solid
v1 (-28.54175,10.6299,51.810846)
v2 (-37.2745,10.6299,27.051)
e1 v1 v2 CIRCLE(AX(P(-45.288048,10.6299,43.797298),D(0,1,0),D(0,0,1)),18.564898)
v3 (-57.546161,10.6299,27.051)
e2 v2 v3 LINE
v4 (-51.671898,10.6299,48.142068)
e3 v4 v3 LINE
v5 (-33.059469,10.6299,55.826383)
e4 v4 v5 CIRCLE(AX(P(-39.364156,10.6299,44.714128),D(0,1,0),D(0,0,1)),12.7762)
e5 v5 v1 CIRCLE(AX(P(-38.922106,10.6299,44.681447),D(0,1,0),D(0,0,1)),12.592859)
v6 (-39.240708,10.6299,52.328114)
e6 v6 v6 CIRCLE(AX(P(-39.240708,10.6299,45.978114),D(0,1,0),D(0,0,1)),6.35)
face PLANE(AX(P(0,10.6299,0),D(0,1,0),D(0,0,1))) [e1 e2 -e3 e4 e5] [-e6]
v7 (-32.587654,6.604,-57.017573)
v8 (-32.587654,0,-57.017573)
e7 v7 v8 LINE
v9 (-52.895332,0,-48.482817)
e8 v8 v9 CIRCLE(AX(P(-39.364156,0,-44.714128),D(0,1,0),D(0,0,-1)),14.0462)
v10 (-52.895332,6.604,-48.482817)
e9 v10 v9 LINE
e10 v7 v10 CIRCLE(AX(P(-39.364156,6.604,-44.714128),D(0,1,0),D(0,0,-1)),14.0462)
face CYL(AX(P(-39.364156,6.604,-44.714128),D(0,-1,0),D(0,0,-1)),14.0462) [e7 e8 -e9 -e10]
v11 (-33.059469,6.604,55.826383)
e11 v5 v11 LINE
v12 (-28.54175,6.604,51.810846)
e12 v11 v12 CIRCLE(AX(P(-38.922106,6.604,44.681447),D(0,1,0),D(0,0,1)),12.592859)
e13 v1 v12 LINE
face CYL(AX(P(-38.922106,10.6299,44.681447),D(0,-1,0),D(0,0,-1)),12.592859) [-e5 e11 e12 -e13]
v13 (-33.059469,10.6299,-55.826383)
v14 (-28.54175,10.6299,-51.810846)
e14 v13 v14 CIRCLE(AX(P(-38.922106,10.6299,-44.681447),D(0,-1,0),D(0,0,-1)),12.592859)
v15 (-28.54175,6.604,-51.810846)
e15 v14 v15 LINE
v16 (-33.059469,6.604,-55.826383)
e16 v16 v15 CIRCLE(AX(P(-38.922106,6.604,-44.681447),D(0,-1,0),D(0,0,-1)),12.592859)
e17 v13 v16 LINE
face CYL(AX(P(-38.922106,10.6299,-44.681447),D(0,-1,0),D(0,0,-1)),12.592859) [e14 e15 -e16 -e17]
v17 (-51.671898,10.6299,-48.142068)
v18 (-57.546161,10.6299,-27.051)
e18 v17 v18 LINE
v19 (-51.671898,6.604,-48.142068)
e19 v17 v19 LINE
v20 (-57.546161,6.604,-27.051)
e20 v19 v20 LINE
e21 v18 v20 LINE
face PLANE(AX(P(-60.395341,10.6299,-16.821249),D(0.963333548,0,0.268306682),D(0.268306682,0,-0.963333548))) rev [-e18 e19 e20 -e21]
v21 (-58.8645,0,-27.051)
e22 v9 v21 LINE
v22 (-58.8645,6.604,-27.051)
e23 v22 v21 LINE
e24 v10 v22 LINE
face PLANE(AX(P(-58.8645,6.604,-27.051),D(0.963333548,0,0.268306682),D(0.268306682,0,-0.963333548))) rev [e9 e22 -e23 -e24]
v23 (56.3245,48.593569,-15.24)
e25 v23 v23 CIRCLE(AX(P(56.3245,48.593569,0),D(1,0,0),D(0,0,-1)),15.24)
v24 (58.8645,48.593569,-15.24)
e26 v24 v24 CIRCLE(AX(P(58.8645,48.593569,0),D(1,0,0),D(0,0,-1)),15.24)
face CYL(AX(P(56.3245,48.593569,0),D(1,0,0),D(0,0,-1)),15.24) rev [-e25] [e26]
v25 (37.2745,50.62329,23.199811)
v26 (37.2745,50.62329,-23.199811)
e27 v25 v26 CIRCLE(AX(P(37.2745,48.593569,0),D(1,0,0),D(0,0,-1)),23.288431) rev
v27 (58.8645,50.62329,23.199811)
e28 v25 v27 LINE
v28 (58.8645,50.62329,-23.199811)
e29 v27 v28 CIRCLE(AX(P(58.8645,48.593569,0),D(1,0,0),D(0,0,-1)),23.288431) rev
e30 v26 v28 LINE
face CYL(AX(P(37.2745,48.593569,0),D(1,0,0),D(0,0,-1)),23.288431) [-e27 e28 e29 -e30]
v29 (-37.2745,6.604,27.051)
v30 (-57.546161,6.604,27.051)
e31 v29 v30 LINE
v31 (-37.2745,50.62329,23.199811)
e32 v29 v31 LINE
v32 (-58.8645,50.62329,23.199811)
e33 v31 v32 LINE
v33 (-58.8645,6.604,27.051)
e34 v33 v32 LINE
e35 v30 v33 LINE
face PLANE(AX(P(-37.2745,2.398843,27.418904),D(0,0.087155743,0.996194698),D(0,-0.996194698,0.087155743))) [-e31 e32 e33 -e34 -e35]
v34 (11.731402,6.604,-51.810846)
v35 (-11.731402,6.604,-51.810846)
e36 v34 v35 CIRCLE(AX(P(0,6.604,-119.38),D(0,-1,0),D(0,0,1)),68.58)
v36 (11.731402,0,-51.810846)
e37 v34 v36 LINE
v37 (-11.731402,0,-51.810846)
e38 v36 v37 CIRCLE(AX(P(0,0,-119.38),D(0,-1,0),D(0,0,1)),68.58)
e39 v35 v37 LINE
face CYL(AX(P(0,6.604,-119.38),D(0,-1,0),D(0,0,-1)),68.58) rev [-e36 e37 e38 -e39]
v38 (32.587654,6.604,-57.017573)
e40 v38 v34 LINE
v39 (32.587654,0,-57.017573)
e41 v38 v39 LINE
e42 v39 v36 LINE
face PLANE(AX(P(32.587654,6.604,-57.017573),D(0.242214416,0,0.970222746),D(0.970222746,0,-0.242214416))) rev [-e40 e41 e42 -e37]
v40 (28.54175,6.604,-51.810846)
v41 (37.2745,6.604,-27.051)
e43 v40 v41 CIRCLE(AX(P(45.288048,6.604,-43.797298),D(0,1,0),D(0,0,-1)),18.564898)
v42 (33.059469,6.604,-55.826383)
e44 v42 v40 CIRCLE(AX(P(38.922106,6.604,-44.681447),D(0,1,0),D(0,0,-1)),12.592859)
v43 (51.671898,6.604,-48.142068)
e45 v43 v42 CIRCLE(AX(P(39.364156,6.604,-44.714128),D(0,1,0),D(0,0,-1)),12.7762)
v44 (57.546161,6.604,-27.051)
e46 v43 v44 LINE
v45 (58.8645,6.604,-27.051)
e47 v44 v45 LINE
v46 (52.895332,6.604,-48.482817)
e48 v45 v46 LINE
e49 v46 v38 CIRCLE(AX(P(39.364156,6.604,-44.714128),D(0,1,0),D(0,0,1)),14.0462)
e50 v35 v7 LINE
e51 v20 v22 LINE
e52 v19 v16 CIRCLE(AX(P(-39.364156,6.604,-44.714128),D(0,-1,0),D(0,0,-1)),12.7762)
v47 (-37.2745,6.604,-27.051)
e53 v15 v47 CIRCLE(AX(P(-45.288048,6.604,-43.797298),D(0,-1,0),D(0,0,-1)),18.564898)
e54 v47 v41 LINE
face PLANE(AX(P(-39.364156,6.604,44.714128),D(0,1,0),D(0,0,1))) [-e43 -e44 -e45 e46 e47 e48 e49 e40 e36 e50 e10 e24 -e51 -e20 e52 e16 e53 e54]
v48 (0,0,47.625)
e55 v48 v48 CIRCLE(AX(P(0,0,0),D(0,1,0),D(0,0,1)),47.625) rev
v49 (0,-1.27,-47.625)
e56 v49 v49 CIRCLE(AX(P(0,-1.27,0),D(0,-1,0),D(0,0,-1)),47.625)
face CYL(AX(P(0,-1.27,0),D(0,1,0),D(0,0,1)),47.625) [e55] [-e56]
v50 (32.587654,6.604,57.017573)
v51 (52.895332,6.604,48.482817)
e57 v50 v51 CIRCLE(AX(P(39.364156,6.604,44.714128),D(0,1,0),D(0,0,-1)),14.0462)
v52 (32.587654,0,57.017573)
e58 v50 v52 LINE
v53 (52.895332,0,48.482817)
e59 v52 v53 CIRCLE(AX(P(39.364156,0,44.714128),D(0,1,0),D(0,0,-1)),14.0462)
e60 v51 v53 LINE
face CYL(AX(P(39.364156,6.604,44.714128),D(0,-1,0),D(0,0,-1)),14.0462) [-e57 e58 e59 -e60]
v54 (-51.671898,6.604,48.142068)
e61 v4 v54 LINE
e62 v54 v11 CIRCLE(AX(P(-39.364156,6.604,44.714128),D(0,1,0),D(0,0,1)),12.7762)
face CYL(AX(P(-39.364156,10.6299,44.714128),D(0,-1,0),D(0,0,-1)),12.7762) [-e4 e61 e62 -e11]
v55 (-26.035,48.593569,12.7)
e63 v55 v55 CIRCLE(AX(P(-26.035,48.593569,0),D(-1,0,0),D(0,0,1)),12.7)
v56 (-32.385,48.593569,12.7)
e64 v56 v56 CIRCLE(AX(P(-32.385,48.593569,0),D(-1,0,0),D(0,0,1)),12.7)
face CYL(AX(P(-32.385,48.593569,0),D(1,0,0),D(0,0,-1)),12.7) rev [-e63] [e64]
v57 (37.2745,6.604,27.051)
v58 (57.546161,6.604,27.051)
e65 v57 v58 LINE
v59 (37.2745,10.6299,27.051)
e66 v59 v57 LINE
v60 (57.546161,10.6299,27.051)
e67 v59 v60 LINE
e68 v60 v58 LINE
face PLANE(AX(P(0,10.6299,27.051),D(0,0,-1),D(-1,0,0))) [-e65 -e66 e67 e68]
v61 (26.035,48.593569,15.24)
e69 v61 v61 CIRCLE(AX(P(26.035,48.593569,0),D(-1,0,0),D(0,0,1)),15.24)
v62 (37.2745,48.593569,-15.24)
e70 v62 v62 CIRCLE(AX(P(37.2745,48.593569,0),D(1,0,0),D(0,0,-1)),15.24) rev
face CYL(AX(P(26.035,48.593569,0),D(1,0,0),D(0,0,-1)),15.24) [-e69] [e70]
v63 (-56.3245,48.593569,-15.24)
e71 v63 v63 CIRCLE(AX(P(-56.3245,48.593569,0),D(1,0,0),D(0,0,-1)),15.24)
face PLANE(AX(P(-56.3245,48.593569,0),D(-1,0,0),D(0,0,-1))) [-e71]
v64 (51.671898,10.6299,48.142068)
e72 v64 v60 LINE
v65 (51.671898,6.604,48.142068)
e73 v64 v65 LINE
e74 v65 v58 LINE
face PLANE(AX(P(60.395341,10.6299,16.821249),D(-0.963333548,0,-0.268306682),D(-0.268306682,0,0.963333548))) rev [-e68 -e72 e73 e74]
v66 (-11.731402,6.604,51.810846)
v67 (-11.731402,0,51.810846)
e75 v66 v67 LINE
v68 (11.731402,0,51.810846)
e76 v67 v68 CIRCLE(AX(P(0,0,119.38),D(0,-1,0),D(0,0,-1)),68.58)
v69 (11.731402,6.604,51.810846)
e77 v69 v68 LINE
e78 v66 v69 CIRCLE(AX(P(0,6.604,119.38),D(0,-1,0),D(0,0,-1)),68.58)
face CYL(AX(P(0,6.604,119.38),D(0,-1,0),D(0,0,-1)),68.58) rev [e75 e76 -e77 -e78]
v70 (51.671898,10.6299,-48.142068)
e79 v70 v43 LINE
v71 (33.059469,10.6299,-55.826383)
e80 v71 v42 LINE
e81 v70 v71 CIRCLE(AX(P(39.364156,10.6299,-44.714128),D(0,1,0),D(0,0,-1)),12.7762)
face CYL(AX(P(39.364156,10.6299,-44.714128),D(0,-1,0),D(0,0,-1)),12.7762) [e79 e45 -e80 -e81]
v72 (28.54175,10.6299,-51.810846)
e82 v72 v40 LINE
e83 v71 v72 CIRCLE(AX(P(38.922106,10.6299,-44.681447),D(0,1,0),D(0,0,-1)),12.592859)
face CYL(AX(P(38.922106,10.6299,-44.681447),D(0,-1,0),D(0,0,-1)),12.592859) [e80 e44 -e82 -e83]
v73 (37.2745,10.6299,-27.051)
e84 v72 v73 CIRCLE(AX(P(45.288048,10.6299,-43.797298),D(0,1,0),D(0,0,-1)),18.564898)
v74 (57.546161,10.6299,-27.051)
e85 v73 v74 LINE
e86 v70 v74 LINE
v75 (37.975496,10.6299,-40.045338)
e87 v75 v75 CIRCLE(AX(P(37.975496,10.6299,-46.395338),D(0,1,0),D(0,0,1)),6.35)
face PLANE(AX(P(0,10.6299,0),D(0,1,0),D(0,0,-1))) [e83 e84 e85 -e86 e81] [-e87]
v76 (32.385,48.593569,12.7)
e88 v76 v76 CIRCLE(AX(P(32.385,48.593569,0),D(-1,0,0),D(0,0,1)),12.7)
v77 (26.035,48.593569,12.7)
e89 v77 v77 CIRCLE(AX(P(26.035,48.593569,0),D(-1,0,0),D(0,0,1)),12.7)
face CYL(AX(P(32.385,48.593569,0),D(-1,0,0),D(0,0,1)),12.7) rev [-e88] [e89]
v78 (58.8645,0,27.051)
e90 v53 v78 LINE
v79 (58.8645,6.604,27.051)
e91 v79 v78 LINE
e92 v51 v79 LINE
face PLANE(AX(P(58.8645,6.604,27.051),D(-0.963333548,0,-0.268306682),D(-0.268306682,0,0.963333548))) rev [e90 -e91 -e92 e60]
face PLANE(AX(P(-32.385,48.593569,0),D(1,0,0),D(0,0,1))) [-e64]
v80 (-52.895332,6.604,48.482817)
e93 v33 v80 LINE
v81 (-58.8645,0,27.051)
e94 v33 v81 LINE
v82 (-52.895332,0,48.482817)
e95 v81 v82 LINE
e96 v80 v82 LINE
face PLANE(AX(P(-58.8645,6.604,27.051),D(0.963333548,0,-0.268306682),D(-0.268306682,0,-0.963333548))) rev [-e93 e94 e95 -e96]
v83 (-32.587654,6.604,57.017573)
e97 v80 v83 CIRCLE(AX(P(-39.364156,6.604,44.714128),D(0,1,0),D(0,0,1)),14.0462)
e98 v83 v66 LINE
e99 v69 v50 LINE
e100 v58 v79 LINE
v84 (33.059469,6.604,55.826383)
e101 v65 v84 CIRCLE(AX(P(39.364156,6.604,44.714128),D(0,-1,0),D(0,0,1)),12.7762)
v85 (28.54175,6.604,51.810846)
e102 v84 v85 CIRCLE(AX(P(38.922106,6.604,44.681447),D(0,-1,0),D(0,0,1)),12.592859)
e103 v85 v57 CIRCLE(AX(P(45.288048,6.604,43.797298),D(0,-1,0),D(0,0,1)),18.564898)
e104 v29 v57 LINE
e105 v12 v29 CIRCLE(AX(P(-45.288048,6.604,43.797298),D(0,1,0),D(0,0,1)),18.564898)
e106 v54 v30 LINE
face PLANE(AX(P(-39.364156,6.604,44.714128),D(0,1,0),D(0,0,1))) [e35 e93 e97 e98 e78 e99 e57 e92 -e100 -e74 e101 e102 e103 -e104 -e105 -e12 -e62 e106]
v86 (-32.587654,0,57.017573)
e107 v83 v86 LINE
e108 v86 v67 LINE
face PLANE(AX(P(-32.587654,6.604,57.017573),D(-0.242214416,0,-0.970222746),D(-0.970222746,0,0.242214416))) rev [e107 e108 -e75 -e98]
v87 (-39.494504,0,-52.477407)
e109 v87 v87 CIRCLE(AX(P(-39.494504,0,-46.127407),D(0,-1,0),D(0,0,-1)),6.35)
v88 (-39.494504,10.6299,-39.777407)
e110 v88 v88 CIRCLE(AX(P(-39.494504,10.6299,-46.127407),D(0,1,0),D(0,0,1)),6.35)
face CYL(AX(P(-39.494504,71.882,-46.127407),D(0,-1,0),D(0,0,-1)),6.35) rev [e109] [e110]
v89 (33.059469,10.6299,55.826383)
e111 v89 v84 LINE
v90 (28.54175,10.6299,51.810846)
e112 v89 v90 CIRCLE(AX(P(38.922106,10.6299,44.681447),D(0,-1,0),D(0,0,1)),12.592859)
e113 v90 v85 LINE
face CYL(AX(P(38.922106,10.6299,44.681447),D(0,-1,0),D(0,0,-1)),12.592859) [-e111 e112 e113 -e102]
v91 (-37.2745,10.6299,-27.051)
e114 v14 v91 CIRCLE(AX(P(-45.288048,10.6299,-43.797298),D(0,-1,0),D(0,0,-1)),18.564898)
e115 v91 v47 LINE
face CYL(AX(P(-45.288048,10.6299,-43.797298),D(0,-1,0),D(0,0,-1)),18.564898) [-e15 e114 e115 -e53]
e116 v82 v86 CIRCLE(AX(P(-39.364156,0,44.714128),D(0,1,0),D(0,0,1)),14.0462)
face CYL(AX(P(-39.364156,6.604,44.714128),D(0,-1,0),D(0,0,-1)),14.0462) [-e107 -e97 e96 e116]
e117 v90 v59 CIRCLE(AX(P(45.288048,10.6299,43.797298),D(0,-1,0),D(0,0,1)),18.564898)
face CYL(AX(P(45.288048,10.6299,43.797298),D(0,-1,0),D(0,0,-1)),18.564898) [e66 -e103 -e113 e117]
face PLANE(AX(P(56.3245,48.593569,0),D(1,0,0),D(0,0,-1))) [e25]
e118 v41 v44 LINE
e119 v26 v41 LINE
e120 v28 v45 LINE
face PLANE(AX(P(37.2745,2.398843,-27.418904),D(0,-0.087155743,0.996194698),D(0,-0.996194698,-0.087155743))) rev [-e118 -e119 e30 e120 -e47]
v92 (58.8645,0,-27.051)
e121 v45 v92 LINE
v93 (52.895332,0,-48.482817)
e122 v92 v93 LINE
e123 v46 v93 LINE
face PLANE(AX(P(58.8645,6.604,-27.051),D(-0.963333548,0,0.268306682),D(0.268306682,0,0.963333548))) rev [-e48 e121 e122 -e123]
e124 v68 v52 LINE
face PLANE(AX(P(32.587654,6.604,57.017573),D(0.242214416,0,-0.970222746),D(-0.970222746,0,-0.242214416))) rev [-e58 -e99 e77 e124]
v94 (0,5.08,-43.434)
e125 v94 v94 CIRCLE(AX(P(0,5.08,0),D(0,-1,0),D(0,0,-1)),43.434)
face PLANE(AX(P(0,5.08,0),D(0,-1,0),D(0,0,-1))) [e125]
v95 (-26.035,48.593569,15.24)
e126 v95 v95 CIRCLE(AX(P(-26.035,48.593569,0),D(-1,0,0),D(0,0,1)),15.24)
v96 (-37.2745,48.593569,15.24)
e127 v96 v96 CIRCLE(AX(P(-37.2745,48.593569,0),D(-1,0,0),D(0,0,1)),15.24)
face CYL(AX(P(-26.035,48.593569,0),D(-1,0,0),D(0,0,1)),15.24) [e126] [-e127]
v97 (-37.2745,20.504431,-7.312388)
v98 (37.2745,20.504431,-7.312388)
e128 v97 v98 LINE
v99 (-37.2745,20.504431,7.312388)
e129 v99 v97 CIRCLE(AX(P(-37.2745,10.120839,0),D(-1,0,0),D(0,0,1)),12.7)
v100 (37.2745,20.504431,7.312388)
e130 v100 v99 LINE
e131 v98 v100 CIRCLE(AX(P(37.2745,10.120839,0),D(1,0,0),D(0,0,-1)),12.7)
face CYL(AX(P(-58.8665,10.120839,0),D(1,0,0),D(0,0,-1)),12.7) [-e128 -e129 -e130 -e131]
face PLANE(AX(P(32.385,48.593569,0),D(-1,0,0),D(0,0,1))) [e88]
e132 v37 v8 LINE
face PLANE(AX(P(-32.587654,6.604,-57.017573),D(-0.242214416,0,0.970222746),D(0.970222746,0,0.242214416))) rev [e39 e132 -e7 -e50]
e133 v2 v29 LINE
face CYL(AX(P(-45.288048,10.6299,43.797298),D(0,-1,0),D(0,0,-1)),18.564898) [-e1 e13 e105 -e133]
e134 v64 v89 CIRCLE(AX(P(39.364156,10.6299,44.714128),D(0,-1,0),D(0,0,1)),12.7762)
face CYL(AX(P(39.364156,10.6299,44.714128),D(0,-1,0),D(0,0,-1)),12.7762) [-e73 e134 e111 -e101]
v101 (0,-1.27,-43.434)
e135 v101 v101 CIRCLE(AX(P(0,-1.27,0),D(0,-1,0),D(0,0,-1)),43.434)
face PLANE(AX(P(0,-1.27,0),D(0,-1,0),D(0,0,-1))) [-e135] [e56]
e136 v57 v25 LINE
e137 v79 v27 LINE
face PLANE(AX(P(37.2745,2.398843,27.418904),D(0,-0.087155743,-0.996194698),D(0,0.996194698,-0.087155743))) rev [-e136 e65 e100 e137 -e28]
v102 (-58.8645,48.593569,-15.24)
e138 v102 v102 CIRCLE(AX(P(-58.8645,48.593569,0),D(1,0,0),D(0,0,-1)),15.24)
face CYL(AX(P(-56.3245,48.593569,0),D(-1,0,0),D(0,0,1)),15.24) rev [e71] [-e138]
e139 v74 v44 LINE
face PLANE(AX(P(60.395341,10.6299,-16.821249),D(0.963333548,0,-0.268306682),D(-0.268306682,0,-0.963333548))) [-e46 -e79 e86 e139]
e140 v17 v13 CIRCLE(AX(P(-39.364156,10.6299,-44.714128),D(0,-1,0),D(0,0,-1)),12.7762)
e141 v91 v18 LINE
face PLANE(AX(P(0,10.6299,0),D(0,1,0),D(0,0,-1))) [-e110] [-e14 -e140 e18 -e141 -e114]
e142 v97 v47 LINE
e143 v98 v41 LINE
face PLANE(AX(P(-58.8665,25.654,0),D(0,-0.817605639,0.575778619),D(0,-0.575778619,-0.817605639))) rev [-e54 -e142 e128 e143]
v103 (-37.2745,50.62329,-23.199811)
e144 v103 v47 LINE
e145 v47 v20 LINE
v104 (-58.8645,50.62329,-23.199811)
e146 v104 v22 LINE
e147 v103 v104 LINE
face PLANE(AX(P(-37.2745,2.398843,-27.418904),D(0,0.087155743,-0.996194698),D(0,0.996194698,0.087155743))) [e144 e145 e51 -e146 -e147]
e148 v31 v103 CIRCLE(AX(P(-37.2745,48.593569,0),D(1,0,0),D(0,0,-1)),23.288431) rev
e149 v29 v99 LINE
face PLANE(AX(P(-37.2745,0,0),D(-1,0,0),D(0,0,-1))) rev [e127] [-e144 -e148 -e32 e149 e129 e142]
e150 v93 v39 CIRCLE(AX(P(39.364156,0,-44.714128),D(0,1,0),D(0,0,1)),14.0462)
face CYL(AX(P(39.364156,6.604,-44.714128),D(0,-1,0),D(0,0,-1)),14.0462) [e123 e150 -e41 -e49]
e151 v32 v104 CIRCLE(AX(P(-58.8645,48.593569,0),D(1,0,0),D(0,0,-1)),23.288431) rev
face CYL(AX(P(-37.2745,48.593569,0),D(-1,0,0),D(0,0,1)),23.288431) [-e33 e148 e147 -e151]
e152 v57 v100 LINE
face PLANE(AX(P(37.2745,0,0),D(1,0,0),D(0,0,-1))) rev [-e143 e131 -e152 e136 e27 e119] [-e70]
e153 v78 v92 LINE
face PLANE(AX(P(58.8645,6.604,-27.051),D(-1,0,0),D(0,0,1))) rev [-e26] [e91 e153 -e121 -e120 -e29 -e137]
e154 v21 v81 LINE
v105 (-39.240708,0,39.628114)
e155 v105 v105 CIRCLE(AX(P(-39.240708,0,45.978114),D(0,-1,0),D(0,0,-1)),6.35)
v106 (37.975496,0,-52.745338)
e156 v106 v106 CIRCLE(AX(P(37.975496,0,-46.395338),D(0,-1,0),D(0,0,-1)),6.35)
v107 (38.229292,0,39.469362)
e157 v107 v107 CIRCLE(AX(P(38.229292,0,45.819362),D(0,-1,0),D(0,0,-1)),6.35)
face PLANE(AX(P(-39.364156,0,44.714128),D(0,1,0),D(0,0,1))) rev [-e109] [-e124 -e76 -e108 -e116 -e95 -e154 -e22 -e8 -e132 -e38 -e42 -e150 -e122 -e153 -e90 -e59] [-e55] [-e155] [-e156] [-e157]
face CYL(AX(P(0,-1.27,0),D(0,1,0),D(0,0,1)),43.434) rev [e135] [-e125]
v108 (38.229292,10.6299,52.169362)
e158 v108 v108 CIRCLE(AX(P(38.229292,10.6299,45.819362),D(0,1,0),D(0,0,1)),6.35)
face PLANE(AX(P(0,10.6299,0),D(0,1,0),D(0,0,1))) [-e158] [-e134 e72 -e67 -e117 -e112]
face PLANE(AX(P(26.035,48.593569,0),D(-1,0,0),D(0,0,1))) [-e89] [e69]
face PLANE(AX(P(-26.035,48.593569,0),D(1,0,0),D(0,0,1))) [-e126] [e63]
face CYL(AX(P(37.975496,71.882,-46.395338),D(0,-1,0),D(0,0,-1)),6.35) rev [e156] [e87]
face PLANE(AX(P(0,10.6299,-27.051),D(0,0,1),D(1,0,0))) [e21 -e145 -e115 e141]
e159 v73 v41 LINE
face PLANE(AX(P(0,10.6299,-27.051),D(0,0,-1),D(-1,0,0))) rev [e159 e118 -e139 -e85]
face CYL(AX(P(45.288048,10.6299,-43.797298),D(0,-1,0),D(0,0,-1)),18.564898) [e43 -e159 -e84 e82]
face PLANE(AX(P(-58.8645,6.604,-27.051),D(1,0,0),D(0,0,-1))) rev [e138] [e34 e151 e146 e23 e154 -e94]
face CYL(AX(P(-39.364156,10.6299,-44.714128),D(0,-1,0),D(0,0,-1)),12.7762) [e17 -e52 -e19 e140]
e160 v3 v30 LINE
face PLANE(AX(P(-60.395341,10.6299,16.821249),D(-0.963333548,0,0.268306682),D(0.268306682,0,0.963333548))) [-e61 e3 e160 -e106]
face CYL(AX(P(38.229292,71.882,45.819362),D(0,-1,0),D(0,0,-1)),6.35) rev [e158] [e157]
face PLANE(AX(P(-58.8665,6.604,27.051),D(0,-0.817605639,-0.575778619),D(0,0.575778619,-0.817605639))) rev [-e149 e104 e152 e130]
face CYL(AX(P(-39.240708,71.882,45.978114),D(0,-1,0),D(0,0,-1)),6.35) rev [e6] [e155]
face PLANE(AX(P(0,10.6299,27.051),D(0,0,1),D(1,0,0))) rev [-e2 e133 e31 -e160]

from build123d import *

# Parameters (mm, degrees)
BOSS_EXTRUDE1_DEPTH  = 6.604
MOVE_FACE1_DEPTH     = 6.604
MOVE_FACE1_2_DEPTH   = 6.604
BOSS_EXTRUDE2_DEPTH  = 21.59
BOSS_EXTRUDE3_REACH  = 135.651
FILLET1_R            = 12.7
BOSS_EXTRUDE4_DEPTH  = 4.0259
MIRROR3_COPY_1_DEPTH = 4.0259
SKETCH13_R           = 6.35
CUT_EXTRUDE1_DEPTH   = 110.931012164
SKETCH9_R            = 47.625
SKETCH9_R_2          = 43.434
BOSS_EXTRUDE7_DEPTH  = 1.27
CUT_EXTRUDE2_START   = -5.08
SKETCH15_R           = 43.434
CUT_EXTRUDE2_DEPTH   = 5.08
SKETCH16_R           = 15.24
CUT_EXTRUDE3_DEPTH   = 2.54
SKETCH17_R           = 15.24
BOSS_EXTRUDE8_DEPTH  = 11.2395
SKETCH18_R           = 12.7
CUT_EXTRUDE4_DEPTH   = 6.35


# Read off the part's stored shape, not the designer's step: Move Face1
with BuildPart() as part:
    # Sketch1 → Boss-Extrude1 (new body)
    with BuildSketch(Plane(origin=(0, 0, 0), x_dir=(1, 0, 0), z_dir=(0, 1, 0))):
        with BuildLine():
            Line((0, 27.051), (0, -27.051))
            Line((0, -27.051), (5.969168013, -48.482817353))
            ThreePointArc((5.969168013, -48.482817353), (14.05820124, -57.663213719), (26.276846155, -57.017572631))
            Line((26.276846155, -57.017572631), (47.13309789, -51.810845761))
            ThreePointArc((47.13309789, -51.810845761), (58.8645, -50.8), (70.59590211, -51.810845761))
            Line((70.59590211, -51.810845761), (91.452153845, -57.017572631))
            ThreePointArc((91.452153845, -57.017572631), (103.67079876, -57.663213719), (111.759831987, -48.482817353))
            Line((111.759831987, -48.482817353), (117.729, -27.051))
            Line((117.729, -27.051), (117.729, 27.051))
            Line((117.729, 27.051), (111.759831987, 48.482817353))
            ThreePointArc((111.759831987, 48.482817353), (103.67079876, 57.663213719), (91.452153845, 57.017572631))
            Line((91.452153845, 57.017572631), (70.59590211, 51.810845761))
            ThreePointArc((70.59590211, 51.810845761), (58.8645, 50.8), (47.13309789, 51.810845761))
            Line((47.13309789, 51.810845761), (26.276846155, 57.017572631))
            ThreePointArc((26.276846155, 57.017572631), (14.05820124, 57.663213719), (5.969168013, 48.482817353))
            Line((5.969168013, 48.482817353), (0, 27.051))
        make_face()
    extrude(amount=BOSS_EXTRUDE1_DEPTH)

    # Move Face1 outline → Move Face1 (cut)
    with BuildSketch(Plane(origin=(0, 0, 0), x_dir=(1, 0, 0), z_dir=(0, 1, 0))):
        with BuildLine():
            ThreePointArc((11.73140211, -51.810845761), (9.381670874, -51.444731901), (7.020658859, -51.160305269))
            ThreePointArc((7.020658859, -51.160305269), (15.412744455, -58.152404227), (26.276846155, -57.017572631))
            Line((26.276846155, -57.017572631), (29.43225, -56.229831564))
            Line((29.43225, -56.229831564), (11.73140211, -51.810845761))
        make_face()
        with BuildLine():
            ThreePointArc((26.276846155, 57.017572631), (15.412744455, 58.152404227), (7.020658859, 51.160305269))
            ThreePointArc((7.020658859, 51.160305269), (9.381670874, 51.444731901), (11.73140211, 51.810845761))
            Line((11.73140211, 51.810845761), (29.43225, 56.229831564))
            Line((29.43225, 56.229831564), (26.276846155, 57.017572631))
        make_face()
        with BuildLine():
            ThreePointArc((52.895331987, -48.482817353), (52.438308346, -49.848549416), (51.843841141, -51.160305269))
            ThreePointArc((51.843841141, -51.160305269), (61.242225011, -50.841231235), (70.59590211, -51.810845761))
            Line((70.59590211, -51.810845761), (91.452153845, -57.017572631))
            ThreePointArc((91.452153845, -57.017572631), (103.67079876, -57.663213719), (111.759831987, -48.482817353))
            Line((111.759831987, -48.482817353), (117.729, -27.051))
            Line((117.729, -27.051), (117.729, 27.051))
            Line((117.729, 27.051), (111.759831987, 48.482817353))
            ThreePointArc((111.759831987, 48.482817353), (103.67079876, 57.663213719), (91.452153845, 57.017572631))
            Line((91.452153845, 57.017572631), (70.59590211, 51.810845761))
            ThreePointArc((70.59590211, 51.810845761), (61.242225011, 50.841231235), (51.843841141, 51.160305269))
            ThreePointArc((51.843841141, 51.160305269), (52.438308346, 49.848549416), (52.895331987, 48.482817353))
            Line((52.895331987, 48.482817353), (58.8645, 27.051))
            Line((58.8645, 27.051), (58.8645, -27.051))
            Line((58.8645, -27.051), (52.895331987, -48.482817353))
        make_face()
    extrude(amount=MOVE_FACE1_DEPTH, mode=Mode.SUBTRACT)

    # Move Face1 2 outline → Move Face1 2 (add)
    with BuildSketch(Plane(origin=(0, 0, 0), x_dir=(1, 0, 0), z_dir=(0, 1, 0))):
        with BuildLine():
            Line((-58.8645, -27.051), (-52.895331987, -48.482817353))
            ThreePointArc((-52.895331987, -48.482817353), (-44.80629876, -57.663213719), (-32.587653845, -57.017572631))
            Line((-32.587653845, -57.017572631), (-11.73140211, -51.810845761))
            ThreePointArc((-11.73140211, -51.810845761), (-2.377725011, -50.841231235), (7.020658859, -51.160305269))
            ThreePointArc((7.020658859, -51.160305269), (6.426191654, -49.848549416), (5.969168013, -48.482817353))
            Line((5.969168013, -48.482817353), (0, -27.051))
            Line((0, -27.051), (0, 27.051))
            Line((0, 27.051), (5.969168013, 48.482817353))
            ThreePointArc((5.969168013, 48.482817353), (6.426191654, 49.848549416), (7.020658859, 51.160305269))
            ThreePointArc((7.020658859, 51.160305269), (-2.377725011, 50.841231235), (-11.73140211, 51.810845761))
            Line((-11.73140211, 51.810845761), (-32.587653845, 57.017572631))
            ThreePointArc((-32.587653845, 57.017572631), (-44.80629876, 57.663213719), (-52.895331987, 48.482817353))
            Line((-52.895331987, 48.482817353), (-58.8645, 27.051))
            Line((-58.8645, 27.051), (-58.8645, -27.051))
        make_face()
        with BuildLine():
            Line((47.13309789, -51.810845761), (29.43225, -56.229831564))
            Line((29.43225, -56.229831564), (32.587653845, -57.017572631))
            ThreePointArc((32.587653845, -57.017572631), (43.451755545, -58.152404227), (51.843841141, -51.160305269))
            ThreePointArc((51.843841141, -51.160305269), (49.482829126, -51.444731901), (47.13309789, -51.810845761))
        make_face()
        with BuildLine():
            Line((32.587653845, 57.017572631), (29.43225, 56.229831564))
            Line((29.43225, 56.229831564), (47.13309789, 51.810845761))
            ThreePointArc((47.13309789, 51.810845761), (49.482829126, 51.444731901), (51.843841141, 51.160305269))
            ThreePointArc((51.843841141, 51.160305269), (43.451755545, 58.152404227), (32.587653845, 57.017572631))
        make_face()
    extrude(amount=MOVE_FACE1_2_DEPTH)

    # Sketch5 → Boss-Extrude2 (add)
    with BuildSketch(Plane(origin=(58.8645, 0, 0), x_dir=(0, 0, -1), z_dir=(1, 0, 0))):
        with BuildLine():
            Line((-23.199811166, 50.623289797), (-27.051, 6.604))
            Line((-27.051, 6.604), (27.051, 6.604))
            Line((27.051, 6.604), (23.199811166, 50.623289797))
            ThreePointArc((23.199811166, 50.623289797), (0, 71.882), (-23.199811166, 50.623289797))
        make_face()
    boss_extrude2 = extrude(amount=-BOSS_EXTRUDE2_DEPTH)

    # Mirror1: Boss-Extrude2 across plane
    add(boss_extrude2.mirror(Plane(origin=(0, 0, 0), x_dir=(0, 0, 1), z_dir=(1, 0, 0))))

    # Sketch7 → Boss-Extrude3 (add, up to next)
    with BuildSketch(Plane.ZY.offset(-37.2745), mode=Mode.PRIVATE) as boss_extrude3_sk1:
        Polygon((-27.051, 6.604), (27.051, 6.604), (0, 25.654), align=None)
    boss_extrude3_tool1 = extrude(boss_extrude3_sk1.sketch, amount=BOSS_EXTRUDE3_REACH, mode=Mode.PRIVATE) - part.part
    add(boss_extrude3_tool1.solids().sort_by_distance((37.2745, 12.954, 0))[0])

    # Fillet1
    fillet1_edges = [part.edges().sort_by_distance(p)[0] for p in [
        (0, 25.654, 0),
    ]]
    fillet(fillet1_edges, radius=FILLET1_R)

    # Sketch8 → Boss-Extrude4 (add)
    with BuildSketch(Plane(origin=(0, 6.604, 0), x_dir=(1, 0, 0), z_dir=(0, 1, 0))):
        with BuildLine():
            Line((-57.546161193, -27.051), (-51.671898381, -48.142067867))
            ThreePointArc((-51.671898381, -48.142067867), (-44.239742404, -56.523444134), (-33.059468887, -55.82638267))
            ThreePointArc((-33.059468887, -55.82638267), (-30.556113123, -54.093687416), (-28.541750469, -51.810845761))
            ThreePointArc((-28.541750469, -51.810845761), (-27.780193276, -37.622311234), (-37.2745, -27.051))
            Line((-37.2745, -27.051), (-57.546161193, -27.051))
        make_face()
    boss_extrude4 = extrude(amount=BOSS_EXTRUDE4_DEPTH)

    # Mirror2: Boss-Extrude4 across plane
    add(boss_extrude4.mirror(Plane(origin=(0, 0, 0), x_dir=(0, 0, 1), z_dir=(1, 0, 0))))

    # Mirror3: Boss-Extrude4 across plane
    add(boss_extrude4.mirror(Plane.XY))

    # Mirror3 copy 1 sketch → Mirror3 copy 1 (add)
    with BuildSketch(Plane(origin=(0, 6.604, 0), x_dir=(-1, 0, 0), z_dir=(0, 1, 0))):
        with BuildLine():
            Line((-57.546161193, -27.051), (-51.671898381, -48.142067867))
            ThreePointArc((-51.671898381, -48.142067867), (-44.239742404, -56.523444134), (-33.059468887, -55.82638267))
            ThreePointArc((-33.059468887, -55.82638267), (-30.556113123, -54.093687416), (-28.541750469, -51.810845761))
            ThreePointArc((-28.541750469, -51.810845761), (-27.780193276, -37.622311234), (-37.2745, -27.051))
            Line((-37.2745, -27.051), (-57.546161193, -27.051))
        make_face()
    extrude(amount=MIRROR3_COPY_1_DEPTH)

    # Sketch13 → Cut-Extrude1 (cut, through all)
    with BuildSketch(Plane(origin=(0, 0, 0), x_dir=(-1, 0, 0), z_dir=(0, -1, 0))):
        with Locations(Location((39.240708081, -45.97811401, 0), (0, 0, 90))):
            Circle(SKETCH13_R)
        with Locations(Location((-38.229291919, -45.81936236, 0), (0, 0, 90))):
            Circle(SKETCH13_R)
        with Locations(Location((-37.975496477, 46.39533764, 0), (0, 0, 90))):
            Circle(SKETCH13_R)
        with Locations(Location((39.494503523, 46.12740723, 0), (0, 0, 90))):
            Circle(SKETCH13_R)
    extrude(amount=-CUT_EXTRUDE1_DEPTH, mode=Mode.SUBTRACT)

    # Sketch9 → Boss-Extrude7 (add)
    with BuildSketch(Plane.XZ):
        with Locations(Location((0, 0, 0), (0, 0, 90))):
            Circle(SKETCH9_R)
        with Locations(Location((0, 0, 0), (0, 0, 270))):
            Circle(SKETCH9_R_2, mode=Mode.SUBTRACT)
    extrude(amount=BOSS_EXTRUDE7_DEPTH)

    # Sketch15 → Cut-Extrude2 (cut)
    with BuildSketch(Plane.XZ.offset(CUT_EXTRUDE2_START)):
        with Locations(Location((0, 0, 0), (0, 0, 270))):
            Circle(SKETCH15_R)
    extrude(amount=CUT_EXTRUDE2_DEPTH, mode=Mode.SUBTRACT)

    # Sketch16 → Cut-Extrude3 (cut)
    with BuildSketch(Plane(origin=(58.8645, 0, 0), x_dir=(0, 0, -1), z_dir=(1, 0, 0))):
        with Locations((0, 48.593569324)):
            Circle(SKETCH16_R)
    cut_extrude3 = extrude(amount=-CUT_EXTRUDE3_DEPTH, mode=Mode.SUBTRACT)

    # Sketch17 → Boss-Extrude8 (add)
    with BuildSketch(Plane.ZY.offset(-37.2745)):
        with Locations(Location((0, 48.593569324, 0), (0, 0, 180))):
            Circle(SKETCH17_R)
    boss_extrude8 = extrude(amount=BOSS_EXTRUDE8_DEPTH)

    # Sketch18 → Cut-Extrude4 (cut)
    with BuildSketch(Plane.ZY.offset(-26.035)):
        with Locations((0, 48.593569324)):
            Circle(SKETCH18_R)
    cut_extrude4 = extrude(amount=-CUT_EXTRUDE4_DEPTH, mode=Mode.SUBTRACT)

    # Mirror4: Cut-Extrude3, Boss-Extrude8, Cut-Extrude4 across plane
    add(cut_extrude3.mirror(Plane(origin=(0, 0, 0), x_dir=(0, 0, 1), z_dir=(1, 0, 0))), mode=Mode.SUBTRACT)
    add(boss_extrude8.mirror(Plane(origin=(0, 0, 0), x_dir=(0, 0, 1), z_dir=(1, 0, 0))))
    add(cut_extrude4.mirror(Plane(origin=(0, 0, 0), x_dir=(0, 0, 1), z_dir=(1, 0, 0))), mode=Mode.SUBTRACT)


solid = part.part
